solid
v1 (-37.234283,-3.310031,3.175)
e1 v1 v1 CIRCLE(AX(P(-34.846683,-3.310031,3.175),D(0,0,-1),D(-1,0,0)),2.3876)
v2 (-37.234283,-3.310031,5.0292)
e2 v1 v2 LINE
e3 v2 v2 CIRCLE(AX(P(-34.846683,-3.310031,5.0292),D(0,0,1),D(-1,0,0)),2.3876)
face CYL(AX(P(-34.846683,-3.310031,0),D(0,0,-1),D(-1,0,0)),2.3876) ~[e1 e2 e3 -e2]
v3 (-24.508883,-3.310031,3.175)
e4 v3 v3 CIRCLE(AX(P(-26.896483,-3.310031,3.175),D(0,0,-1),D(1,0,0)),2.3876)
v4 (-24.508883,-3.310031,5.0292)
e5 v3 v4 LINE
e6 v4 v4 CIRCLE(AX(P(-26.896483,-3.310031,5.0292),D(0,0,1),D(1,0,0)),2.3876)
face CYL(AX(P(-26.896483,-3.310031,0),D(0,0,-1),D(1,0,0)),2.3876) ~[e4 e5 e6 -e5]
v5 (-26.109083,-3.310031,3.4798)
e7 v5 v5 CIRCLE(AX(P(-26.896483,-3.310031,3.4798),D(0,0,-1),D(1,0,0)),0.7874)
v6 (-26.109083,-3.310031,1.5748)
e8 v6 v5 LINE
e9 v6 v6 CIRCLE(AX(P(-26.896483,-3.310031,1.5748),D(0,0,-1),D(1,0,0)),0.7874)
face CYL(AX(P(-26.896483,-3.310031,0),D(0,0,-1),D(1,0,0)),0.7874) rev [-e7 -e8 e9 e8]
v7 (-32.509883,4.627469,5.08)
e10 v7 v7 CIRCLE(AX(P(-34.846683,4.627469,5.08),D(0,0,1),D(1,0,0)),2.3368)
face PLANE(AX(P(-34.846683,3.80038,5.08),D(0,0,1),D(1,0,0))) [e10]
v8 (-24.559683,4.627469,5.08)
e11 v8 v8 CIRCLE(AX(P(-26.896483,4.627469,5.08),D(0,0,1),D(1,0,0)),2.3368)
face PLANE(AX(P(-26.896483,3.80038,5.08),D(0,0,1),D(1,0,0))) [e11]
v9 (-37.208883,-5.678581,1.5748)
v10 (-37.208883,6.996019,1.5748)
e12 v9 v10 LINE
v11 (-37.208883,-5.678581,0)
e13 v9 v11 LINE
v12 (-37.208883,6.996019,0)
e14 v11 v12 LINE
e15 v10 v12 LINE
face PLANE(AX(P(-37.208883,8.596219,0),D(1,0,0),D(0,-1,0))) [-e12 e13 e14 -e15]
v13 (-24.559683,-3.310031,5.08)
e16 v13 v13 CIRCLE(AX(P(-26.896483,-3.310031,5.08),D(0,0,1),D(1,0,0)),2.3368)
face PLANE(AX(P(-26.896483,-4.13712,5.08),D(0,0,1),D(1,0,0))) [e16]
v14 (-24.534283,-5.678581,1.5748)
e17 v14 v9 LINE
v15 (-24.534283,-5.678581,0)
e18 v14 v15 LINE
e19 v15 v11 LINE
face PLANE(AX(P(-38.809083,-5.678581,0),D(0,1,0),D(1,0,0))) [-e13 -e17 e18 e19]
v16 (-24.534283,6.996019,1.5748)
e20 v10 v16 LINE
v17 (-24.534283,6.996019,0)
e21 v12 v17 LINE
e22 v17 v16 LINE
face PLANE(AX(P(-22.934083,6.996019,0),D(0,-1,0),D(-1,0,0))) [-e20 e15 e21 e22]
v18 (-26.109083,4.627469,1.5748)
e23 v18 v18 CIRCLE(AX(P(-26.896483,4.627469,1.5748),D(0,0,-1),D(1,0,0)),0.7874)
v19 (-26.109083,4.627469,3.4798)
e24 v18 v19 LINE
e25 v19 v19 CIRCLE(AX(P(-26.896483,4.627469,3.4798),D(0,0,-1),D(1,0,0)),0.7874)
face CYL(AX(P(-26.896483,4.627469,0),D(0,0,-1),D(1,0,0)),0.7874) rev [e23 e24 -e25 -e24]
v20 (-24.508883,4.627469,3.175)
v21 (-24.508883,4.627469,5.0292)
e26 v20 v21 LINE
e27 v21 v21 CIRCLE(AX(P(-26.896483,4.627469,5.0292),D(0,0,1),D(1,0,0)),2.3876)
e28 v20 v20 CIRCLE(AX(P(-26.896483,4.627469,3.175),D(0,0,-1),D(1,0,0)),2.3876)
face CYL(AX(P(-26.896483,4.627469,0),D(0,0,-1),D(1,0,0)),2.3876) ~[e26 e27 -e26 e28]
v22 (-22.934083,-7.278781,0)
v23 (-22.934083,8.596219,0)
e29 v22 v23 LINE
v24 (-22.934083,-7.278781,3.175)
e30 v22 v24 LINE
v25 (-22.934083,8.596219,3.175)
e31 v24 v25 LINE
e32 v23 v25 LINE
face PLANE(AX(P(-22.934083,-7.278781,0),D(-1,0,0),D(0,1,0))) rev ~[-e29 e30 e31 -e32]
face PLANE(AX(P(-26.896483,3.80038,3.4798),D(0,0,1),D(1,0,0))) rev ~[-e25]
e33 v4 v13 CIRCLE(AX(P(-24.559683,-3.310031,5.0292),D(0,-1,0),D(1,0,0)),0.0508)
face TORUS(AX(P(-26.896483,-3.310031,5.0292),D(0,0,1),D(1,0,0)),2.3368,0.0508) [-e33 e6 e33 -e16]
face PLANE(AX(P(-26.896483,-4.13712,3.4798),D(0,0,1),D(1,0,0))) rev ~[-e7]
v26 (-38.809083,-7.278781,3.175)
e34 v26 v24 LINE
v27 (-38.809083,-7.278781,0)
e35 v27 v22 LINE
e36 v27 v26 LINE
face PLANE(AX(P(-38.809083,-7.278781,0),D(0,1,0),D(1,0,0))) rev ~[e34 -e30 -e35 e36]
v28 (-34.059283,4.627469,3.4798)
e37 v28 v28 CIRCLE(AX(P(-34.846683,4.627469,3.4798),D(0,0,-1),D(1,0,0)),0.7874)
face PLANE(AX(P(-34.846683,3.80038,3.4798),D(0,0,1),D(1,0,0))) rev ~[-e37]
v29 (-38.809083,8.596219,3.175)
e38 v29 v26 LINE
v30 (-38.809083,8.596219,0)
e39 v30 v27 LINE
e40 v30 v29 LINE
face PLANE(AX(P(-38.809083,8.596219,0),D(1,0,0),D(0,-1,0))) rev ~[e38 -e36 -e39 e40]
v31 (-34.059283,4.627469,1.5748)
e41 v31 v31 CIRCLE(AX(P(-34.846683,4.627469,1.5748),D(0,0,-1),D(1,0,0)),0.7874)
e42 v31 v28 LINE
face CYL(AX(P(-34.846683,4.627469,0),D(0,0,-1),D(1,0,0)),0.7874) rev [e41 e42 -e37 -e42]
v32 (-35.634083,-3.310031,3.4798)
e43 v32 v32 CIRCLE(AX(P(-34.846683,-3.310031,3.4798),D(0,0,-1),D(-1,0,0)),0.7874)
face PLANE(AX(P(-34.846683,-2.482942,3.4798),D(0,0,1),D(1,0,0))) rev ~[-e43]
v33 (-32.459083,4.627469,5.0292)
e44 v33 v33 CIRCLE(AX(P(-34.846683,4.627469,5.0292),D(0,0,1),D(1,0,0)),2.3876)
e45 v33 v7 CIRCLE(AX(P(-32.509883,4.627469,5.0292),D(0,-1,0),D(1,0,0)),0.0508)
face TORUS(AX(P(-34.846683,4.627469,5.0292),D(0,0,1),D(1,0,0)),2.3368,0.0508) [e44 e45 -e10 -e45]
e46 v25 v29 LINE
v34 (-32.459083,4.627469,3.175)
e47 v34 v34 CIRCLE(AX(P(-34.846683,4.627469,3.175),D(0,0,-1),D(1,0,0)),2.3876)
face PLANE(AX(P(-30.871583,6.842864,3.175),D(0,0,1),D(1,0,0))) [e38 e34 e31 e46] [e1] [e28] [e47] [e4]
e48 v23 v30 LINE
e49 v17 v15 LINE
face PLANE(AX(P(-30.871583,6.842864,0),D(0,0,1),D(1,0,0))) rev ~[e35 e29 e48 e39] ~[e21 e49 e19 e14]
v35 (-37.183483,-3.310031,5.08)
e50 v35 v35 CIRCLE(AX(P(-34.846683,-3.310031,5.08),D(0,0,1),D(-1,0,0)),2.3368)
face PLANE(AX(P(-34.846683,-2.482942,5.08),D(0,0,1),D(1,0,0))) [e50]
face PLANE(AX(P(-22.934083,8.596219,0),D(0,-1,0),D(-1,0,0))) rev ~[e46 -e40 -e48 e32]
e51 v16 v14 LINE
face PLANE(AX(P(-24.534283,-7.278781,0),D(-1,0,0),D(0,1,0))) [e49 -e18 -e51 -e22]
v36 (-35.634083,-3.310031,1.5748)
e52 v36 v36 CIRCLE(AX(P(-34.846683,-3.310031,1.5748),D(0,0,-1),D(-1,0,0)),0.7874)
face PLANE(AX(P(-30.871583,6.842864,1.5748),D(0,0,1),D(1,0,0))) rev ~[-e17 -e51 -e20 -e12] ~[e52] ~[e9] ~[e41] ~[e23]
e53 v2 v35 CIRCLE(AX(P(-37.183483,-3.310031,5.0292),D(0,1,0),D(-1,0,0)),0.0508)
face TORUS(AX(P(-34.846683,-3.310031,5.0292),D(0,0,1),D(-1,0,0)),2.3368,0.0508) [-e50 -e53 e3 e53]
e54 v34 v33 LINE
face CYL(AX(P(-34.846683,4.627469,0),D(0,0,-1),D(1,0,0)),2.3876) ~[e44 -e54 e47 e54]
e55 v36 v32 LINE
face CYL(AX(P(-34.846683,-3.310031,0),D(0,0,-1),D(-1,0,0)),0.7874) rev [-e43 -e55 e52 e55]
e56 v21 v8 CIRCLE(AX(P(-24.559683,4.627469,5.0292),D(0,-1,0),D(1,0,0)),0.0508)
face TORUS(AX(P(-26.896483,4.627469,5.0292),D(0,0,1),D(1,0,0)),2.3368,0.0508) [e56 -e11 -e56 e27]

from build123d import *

# Parameters (mm, degrees)
F1_DEPTH = 3.175
F2_DEPTH = 5.08
F3_T     = -1.6002
F4_R     = 0.0508


# Not quite as in the source:
# - a feature names something its author has since deleted; it is built from what else it names


with BuildPart() as f1:
    # F0 (on Top) → F1 (new body)
    with BuildSketch(Plane.XY):
        with BuildLine():
            Line((-22.9340831819, 8.5962191019), (-38.8090831819, 8.5962191019))
            Line((-38.8090831819, 8.5962191019), (-38.8090831819, 4.6274691019))
            Line((-38.8090831819, 4.6274691019), (-37.2342831819, 4.6274691019))
            ThreePointArc((-37.2342831819, 4.6274691019), (-34.8466831819, 7.0150691019), (-32.4590831819, 4.6274691019))
            Line((-32.4590831819, 4.6274691019), (-29.2840831819, 4.6274691019))
            ThreePointArc((-29.2840831819, 4.6274691019), (-26.8964831819, 7.0150691019), (-24.5088831819, 4.6274691019))
            Line((-24.5088831819, 4.6274691019), (-22.9340831819, 4.6274691019))
            Line((-22.9340831819, 4.6274691019), (-22.9340831819, 8.5962191019))
        make_face()
        with BuildLine():
            Line((-37.2342831819, 4.6274691019), (-38.8090831819, 4.6274691019))
            Line((-38.8090831819, 4.6274691019), (-38.8090831819, 0.6587191019))
            Line((-38.8090831819, 0.6587191019), (-22.9340831819, 0.6587191019))
            Line((-22.9340831819, 0.6587191019), (-22.9340831819, 4.6274691019))
            Line((-22.9340831819, 4.6274691019), (-24.5088831819, 4.6274691019))
            ThreePointArc((-24.5088831819, 4.6274691019), (-26.8964831819, 2.2398691019), (-29.2840831819, 4.6274691019))
            Line((-29.2840831819, 4.6274691019), (-32.4590831819, 4.6274691019))
            ThreePointArc((-32.4590831819, 4.6274691019), (-34.8466831819, 2.2398691019), (-37.2342831819, 4.6274691019))
        make_face()
        with BuildLine():
            Line((-37.2342831819, -3.3100308981), (-38.8090831819, -3.3100308981))
            Line((-38.8090831819, -3.3100308981), (-38.8090831819, -7.2787808981))
            Line((-38.8090831819, -7.2787808981), (-22.9340831819, -7.2787808981))
            Line((-22.9340831819, -7.2787808981), (-22.9340831819, -3.3100308981))
            Line((-22.9340831819, -3.3100308981), (-24.5088831819, -3.3100308981))
            ThreePointArc((-24.5088831819, -3.3100308981), (-26.8964831819, -5.6976308981), (-29.2840831819, -3.3100308981))
            Line((-29.2840831819, -3.3100308981), (-32.4590831819, -3.3100308981))
            ThreePointArc((-32.4590831819, -3.3100308981), (-34.8466831819, -5.6976308981), (-37.2342831819, -3.3100308981))
        make_face()
        with BuildLine():
            Line((-22.9340831819, 0.6587191019), (-38.8090831819, 0.6587191019))
            Line((-38.8090831819, 0.6587191019), (-38.8090831819, -3.3100308981))
            Line((-38.8090831819, -3.3100308981), (-37.2342831819, -3.3100308981))
            ThreePointArc((-37.2342831819, -3.3100308981), (-34.8466831819, -0.9224308981), (-32.4590831819, -3.3100308981))
            Line((-32.4590831819, -3.3100308981), (-29.2840831819, -3.3100308981))
            ThreePointArc((-29.2840831819, -3.3100308981), (-26.8964831819, -0.9224308981), (-24.5088831819, -3.3100308981))
            Line((-24.5088831819, -3.3100308981), (-22.9340831819, -3.3100308981))
            Line((-22.9340831819, -3.3100308981), (-22.9340831819, 0.6587191019))
        make_face()
    extrude(amount=F1_DEPTH)

    # F0 (on Top) → F2 (join)
    with BuildSketch(Plane.XY):
        with BuildLine():
            Line((-32.4590831819, 4.6274691019), (-37.2342831819, 4.6274691019))
            ThreePointArc((-37.2342831819, 4.6274691019), (-34.8466831819, 2.2398691019), (-32.4590831819, 4.6274691019))
        make_face()
        with BuildLine():
            ThreePointArc((-32.4590831819, 4.6274691019), (-34.8466831819, 7.0150691019), (-37.2342831819, 4.6274691019))
            Line((-37.2342831819, 4.6274691019), (-32.4590831819, 4.6274691019))
        make_face()
        with BuildLine():
            ThreePointArc((-32.4590831819, -3.3100308981), (-34.8466831819, -0.9224308981), (-37.2342831819, -3.3100308981))
            Line((-37.2342831819, -3.3100308981), (-32.4590831819, -3.3100308981))
        make_face()
        with BuildLine():
            Line((-32.4590831819, -3.3100308981), (-37.2342831819, -3.3100308981))
            ThreePointArc((-37.2342831819, -3.3100308981), (-34.8466831819, -5.6976308981), (-32.4590831819, -3.3100308981))
        make_face()
        with BuildLine():
            ThreePointArc((-29.2840831819, -3.3100308981), (-26.8964831819, -5.6976308981), (-24.5088831819, -3.3100308981))
            Line((-24.5088831819, -3.3100308981), (-29.2840831819, -3.3100308981))
        make_face()
        with BuildLine():
            Line((-29.2840831819, -3.3100308981), (-24.5088831819, -3.3100308981))
            ThreePointArc((-24.5088831819, -3.3100308981), (-26.8964831819, -0.9224308981), (-29.2840831819, -3.3100308981))
        make_face()
        with BuildLine():
            ThreePointArc((-29.2840831819, 4.6274691019), (-26.8964831819, 2.2398691019), (-24.5088831819, 4.6274691019))
            Line((-24.5088831819, 4.6274691019), (-29.2840831819, 4.6274691019))
        make_face()
        with BuildLine():
            Line((-29.2840831819, 4.6274691019), (-24.5088831819, 4.6274691019))
            ThreePointArc((-24.5088831819, 4.6274691019), (-26.8964831819, 7.0150691019), (-29.2840831819, 4.6274691019))
        make_face()
    extrude(amount=F2_DEPTH)

    # F3
    f3_openings = [f1.faces().sort_by_distance(p)[0] for p in [
        (-30.871583, 0.658719, 0),
    ]]
    offset(amount=F3_T, openings=f3_openings, kind=Kind.INTERSECTION)

    # F4
    f4_edges = [f1.edges().sort_by_distance(p)[0] for p in [
        (-32.459083, -3.310031, 5.08),
        (-29.284083, -3.310031, 5.08),
        (-29.284083, 4.627469, 5.08),
        (-37.234283, 4.627469, 5.08),
    ]]
    fillet(f4_edges, radius=F4_R)


solid = f1.part
